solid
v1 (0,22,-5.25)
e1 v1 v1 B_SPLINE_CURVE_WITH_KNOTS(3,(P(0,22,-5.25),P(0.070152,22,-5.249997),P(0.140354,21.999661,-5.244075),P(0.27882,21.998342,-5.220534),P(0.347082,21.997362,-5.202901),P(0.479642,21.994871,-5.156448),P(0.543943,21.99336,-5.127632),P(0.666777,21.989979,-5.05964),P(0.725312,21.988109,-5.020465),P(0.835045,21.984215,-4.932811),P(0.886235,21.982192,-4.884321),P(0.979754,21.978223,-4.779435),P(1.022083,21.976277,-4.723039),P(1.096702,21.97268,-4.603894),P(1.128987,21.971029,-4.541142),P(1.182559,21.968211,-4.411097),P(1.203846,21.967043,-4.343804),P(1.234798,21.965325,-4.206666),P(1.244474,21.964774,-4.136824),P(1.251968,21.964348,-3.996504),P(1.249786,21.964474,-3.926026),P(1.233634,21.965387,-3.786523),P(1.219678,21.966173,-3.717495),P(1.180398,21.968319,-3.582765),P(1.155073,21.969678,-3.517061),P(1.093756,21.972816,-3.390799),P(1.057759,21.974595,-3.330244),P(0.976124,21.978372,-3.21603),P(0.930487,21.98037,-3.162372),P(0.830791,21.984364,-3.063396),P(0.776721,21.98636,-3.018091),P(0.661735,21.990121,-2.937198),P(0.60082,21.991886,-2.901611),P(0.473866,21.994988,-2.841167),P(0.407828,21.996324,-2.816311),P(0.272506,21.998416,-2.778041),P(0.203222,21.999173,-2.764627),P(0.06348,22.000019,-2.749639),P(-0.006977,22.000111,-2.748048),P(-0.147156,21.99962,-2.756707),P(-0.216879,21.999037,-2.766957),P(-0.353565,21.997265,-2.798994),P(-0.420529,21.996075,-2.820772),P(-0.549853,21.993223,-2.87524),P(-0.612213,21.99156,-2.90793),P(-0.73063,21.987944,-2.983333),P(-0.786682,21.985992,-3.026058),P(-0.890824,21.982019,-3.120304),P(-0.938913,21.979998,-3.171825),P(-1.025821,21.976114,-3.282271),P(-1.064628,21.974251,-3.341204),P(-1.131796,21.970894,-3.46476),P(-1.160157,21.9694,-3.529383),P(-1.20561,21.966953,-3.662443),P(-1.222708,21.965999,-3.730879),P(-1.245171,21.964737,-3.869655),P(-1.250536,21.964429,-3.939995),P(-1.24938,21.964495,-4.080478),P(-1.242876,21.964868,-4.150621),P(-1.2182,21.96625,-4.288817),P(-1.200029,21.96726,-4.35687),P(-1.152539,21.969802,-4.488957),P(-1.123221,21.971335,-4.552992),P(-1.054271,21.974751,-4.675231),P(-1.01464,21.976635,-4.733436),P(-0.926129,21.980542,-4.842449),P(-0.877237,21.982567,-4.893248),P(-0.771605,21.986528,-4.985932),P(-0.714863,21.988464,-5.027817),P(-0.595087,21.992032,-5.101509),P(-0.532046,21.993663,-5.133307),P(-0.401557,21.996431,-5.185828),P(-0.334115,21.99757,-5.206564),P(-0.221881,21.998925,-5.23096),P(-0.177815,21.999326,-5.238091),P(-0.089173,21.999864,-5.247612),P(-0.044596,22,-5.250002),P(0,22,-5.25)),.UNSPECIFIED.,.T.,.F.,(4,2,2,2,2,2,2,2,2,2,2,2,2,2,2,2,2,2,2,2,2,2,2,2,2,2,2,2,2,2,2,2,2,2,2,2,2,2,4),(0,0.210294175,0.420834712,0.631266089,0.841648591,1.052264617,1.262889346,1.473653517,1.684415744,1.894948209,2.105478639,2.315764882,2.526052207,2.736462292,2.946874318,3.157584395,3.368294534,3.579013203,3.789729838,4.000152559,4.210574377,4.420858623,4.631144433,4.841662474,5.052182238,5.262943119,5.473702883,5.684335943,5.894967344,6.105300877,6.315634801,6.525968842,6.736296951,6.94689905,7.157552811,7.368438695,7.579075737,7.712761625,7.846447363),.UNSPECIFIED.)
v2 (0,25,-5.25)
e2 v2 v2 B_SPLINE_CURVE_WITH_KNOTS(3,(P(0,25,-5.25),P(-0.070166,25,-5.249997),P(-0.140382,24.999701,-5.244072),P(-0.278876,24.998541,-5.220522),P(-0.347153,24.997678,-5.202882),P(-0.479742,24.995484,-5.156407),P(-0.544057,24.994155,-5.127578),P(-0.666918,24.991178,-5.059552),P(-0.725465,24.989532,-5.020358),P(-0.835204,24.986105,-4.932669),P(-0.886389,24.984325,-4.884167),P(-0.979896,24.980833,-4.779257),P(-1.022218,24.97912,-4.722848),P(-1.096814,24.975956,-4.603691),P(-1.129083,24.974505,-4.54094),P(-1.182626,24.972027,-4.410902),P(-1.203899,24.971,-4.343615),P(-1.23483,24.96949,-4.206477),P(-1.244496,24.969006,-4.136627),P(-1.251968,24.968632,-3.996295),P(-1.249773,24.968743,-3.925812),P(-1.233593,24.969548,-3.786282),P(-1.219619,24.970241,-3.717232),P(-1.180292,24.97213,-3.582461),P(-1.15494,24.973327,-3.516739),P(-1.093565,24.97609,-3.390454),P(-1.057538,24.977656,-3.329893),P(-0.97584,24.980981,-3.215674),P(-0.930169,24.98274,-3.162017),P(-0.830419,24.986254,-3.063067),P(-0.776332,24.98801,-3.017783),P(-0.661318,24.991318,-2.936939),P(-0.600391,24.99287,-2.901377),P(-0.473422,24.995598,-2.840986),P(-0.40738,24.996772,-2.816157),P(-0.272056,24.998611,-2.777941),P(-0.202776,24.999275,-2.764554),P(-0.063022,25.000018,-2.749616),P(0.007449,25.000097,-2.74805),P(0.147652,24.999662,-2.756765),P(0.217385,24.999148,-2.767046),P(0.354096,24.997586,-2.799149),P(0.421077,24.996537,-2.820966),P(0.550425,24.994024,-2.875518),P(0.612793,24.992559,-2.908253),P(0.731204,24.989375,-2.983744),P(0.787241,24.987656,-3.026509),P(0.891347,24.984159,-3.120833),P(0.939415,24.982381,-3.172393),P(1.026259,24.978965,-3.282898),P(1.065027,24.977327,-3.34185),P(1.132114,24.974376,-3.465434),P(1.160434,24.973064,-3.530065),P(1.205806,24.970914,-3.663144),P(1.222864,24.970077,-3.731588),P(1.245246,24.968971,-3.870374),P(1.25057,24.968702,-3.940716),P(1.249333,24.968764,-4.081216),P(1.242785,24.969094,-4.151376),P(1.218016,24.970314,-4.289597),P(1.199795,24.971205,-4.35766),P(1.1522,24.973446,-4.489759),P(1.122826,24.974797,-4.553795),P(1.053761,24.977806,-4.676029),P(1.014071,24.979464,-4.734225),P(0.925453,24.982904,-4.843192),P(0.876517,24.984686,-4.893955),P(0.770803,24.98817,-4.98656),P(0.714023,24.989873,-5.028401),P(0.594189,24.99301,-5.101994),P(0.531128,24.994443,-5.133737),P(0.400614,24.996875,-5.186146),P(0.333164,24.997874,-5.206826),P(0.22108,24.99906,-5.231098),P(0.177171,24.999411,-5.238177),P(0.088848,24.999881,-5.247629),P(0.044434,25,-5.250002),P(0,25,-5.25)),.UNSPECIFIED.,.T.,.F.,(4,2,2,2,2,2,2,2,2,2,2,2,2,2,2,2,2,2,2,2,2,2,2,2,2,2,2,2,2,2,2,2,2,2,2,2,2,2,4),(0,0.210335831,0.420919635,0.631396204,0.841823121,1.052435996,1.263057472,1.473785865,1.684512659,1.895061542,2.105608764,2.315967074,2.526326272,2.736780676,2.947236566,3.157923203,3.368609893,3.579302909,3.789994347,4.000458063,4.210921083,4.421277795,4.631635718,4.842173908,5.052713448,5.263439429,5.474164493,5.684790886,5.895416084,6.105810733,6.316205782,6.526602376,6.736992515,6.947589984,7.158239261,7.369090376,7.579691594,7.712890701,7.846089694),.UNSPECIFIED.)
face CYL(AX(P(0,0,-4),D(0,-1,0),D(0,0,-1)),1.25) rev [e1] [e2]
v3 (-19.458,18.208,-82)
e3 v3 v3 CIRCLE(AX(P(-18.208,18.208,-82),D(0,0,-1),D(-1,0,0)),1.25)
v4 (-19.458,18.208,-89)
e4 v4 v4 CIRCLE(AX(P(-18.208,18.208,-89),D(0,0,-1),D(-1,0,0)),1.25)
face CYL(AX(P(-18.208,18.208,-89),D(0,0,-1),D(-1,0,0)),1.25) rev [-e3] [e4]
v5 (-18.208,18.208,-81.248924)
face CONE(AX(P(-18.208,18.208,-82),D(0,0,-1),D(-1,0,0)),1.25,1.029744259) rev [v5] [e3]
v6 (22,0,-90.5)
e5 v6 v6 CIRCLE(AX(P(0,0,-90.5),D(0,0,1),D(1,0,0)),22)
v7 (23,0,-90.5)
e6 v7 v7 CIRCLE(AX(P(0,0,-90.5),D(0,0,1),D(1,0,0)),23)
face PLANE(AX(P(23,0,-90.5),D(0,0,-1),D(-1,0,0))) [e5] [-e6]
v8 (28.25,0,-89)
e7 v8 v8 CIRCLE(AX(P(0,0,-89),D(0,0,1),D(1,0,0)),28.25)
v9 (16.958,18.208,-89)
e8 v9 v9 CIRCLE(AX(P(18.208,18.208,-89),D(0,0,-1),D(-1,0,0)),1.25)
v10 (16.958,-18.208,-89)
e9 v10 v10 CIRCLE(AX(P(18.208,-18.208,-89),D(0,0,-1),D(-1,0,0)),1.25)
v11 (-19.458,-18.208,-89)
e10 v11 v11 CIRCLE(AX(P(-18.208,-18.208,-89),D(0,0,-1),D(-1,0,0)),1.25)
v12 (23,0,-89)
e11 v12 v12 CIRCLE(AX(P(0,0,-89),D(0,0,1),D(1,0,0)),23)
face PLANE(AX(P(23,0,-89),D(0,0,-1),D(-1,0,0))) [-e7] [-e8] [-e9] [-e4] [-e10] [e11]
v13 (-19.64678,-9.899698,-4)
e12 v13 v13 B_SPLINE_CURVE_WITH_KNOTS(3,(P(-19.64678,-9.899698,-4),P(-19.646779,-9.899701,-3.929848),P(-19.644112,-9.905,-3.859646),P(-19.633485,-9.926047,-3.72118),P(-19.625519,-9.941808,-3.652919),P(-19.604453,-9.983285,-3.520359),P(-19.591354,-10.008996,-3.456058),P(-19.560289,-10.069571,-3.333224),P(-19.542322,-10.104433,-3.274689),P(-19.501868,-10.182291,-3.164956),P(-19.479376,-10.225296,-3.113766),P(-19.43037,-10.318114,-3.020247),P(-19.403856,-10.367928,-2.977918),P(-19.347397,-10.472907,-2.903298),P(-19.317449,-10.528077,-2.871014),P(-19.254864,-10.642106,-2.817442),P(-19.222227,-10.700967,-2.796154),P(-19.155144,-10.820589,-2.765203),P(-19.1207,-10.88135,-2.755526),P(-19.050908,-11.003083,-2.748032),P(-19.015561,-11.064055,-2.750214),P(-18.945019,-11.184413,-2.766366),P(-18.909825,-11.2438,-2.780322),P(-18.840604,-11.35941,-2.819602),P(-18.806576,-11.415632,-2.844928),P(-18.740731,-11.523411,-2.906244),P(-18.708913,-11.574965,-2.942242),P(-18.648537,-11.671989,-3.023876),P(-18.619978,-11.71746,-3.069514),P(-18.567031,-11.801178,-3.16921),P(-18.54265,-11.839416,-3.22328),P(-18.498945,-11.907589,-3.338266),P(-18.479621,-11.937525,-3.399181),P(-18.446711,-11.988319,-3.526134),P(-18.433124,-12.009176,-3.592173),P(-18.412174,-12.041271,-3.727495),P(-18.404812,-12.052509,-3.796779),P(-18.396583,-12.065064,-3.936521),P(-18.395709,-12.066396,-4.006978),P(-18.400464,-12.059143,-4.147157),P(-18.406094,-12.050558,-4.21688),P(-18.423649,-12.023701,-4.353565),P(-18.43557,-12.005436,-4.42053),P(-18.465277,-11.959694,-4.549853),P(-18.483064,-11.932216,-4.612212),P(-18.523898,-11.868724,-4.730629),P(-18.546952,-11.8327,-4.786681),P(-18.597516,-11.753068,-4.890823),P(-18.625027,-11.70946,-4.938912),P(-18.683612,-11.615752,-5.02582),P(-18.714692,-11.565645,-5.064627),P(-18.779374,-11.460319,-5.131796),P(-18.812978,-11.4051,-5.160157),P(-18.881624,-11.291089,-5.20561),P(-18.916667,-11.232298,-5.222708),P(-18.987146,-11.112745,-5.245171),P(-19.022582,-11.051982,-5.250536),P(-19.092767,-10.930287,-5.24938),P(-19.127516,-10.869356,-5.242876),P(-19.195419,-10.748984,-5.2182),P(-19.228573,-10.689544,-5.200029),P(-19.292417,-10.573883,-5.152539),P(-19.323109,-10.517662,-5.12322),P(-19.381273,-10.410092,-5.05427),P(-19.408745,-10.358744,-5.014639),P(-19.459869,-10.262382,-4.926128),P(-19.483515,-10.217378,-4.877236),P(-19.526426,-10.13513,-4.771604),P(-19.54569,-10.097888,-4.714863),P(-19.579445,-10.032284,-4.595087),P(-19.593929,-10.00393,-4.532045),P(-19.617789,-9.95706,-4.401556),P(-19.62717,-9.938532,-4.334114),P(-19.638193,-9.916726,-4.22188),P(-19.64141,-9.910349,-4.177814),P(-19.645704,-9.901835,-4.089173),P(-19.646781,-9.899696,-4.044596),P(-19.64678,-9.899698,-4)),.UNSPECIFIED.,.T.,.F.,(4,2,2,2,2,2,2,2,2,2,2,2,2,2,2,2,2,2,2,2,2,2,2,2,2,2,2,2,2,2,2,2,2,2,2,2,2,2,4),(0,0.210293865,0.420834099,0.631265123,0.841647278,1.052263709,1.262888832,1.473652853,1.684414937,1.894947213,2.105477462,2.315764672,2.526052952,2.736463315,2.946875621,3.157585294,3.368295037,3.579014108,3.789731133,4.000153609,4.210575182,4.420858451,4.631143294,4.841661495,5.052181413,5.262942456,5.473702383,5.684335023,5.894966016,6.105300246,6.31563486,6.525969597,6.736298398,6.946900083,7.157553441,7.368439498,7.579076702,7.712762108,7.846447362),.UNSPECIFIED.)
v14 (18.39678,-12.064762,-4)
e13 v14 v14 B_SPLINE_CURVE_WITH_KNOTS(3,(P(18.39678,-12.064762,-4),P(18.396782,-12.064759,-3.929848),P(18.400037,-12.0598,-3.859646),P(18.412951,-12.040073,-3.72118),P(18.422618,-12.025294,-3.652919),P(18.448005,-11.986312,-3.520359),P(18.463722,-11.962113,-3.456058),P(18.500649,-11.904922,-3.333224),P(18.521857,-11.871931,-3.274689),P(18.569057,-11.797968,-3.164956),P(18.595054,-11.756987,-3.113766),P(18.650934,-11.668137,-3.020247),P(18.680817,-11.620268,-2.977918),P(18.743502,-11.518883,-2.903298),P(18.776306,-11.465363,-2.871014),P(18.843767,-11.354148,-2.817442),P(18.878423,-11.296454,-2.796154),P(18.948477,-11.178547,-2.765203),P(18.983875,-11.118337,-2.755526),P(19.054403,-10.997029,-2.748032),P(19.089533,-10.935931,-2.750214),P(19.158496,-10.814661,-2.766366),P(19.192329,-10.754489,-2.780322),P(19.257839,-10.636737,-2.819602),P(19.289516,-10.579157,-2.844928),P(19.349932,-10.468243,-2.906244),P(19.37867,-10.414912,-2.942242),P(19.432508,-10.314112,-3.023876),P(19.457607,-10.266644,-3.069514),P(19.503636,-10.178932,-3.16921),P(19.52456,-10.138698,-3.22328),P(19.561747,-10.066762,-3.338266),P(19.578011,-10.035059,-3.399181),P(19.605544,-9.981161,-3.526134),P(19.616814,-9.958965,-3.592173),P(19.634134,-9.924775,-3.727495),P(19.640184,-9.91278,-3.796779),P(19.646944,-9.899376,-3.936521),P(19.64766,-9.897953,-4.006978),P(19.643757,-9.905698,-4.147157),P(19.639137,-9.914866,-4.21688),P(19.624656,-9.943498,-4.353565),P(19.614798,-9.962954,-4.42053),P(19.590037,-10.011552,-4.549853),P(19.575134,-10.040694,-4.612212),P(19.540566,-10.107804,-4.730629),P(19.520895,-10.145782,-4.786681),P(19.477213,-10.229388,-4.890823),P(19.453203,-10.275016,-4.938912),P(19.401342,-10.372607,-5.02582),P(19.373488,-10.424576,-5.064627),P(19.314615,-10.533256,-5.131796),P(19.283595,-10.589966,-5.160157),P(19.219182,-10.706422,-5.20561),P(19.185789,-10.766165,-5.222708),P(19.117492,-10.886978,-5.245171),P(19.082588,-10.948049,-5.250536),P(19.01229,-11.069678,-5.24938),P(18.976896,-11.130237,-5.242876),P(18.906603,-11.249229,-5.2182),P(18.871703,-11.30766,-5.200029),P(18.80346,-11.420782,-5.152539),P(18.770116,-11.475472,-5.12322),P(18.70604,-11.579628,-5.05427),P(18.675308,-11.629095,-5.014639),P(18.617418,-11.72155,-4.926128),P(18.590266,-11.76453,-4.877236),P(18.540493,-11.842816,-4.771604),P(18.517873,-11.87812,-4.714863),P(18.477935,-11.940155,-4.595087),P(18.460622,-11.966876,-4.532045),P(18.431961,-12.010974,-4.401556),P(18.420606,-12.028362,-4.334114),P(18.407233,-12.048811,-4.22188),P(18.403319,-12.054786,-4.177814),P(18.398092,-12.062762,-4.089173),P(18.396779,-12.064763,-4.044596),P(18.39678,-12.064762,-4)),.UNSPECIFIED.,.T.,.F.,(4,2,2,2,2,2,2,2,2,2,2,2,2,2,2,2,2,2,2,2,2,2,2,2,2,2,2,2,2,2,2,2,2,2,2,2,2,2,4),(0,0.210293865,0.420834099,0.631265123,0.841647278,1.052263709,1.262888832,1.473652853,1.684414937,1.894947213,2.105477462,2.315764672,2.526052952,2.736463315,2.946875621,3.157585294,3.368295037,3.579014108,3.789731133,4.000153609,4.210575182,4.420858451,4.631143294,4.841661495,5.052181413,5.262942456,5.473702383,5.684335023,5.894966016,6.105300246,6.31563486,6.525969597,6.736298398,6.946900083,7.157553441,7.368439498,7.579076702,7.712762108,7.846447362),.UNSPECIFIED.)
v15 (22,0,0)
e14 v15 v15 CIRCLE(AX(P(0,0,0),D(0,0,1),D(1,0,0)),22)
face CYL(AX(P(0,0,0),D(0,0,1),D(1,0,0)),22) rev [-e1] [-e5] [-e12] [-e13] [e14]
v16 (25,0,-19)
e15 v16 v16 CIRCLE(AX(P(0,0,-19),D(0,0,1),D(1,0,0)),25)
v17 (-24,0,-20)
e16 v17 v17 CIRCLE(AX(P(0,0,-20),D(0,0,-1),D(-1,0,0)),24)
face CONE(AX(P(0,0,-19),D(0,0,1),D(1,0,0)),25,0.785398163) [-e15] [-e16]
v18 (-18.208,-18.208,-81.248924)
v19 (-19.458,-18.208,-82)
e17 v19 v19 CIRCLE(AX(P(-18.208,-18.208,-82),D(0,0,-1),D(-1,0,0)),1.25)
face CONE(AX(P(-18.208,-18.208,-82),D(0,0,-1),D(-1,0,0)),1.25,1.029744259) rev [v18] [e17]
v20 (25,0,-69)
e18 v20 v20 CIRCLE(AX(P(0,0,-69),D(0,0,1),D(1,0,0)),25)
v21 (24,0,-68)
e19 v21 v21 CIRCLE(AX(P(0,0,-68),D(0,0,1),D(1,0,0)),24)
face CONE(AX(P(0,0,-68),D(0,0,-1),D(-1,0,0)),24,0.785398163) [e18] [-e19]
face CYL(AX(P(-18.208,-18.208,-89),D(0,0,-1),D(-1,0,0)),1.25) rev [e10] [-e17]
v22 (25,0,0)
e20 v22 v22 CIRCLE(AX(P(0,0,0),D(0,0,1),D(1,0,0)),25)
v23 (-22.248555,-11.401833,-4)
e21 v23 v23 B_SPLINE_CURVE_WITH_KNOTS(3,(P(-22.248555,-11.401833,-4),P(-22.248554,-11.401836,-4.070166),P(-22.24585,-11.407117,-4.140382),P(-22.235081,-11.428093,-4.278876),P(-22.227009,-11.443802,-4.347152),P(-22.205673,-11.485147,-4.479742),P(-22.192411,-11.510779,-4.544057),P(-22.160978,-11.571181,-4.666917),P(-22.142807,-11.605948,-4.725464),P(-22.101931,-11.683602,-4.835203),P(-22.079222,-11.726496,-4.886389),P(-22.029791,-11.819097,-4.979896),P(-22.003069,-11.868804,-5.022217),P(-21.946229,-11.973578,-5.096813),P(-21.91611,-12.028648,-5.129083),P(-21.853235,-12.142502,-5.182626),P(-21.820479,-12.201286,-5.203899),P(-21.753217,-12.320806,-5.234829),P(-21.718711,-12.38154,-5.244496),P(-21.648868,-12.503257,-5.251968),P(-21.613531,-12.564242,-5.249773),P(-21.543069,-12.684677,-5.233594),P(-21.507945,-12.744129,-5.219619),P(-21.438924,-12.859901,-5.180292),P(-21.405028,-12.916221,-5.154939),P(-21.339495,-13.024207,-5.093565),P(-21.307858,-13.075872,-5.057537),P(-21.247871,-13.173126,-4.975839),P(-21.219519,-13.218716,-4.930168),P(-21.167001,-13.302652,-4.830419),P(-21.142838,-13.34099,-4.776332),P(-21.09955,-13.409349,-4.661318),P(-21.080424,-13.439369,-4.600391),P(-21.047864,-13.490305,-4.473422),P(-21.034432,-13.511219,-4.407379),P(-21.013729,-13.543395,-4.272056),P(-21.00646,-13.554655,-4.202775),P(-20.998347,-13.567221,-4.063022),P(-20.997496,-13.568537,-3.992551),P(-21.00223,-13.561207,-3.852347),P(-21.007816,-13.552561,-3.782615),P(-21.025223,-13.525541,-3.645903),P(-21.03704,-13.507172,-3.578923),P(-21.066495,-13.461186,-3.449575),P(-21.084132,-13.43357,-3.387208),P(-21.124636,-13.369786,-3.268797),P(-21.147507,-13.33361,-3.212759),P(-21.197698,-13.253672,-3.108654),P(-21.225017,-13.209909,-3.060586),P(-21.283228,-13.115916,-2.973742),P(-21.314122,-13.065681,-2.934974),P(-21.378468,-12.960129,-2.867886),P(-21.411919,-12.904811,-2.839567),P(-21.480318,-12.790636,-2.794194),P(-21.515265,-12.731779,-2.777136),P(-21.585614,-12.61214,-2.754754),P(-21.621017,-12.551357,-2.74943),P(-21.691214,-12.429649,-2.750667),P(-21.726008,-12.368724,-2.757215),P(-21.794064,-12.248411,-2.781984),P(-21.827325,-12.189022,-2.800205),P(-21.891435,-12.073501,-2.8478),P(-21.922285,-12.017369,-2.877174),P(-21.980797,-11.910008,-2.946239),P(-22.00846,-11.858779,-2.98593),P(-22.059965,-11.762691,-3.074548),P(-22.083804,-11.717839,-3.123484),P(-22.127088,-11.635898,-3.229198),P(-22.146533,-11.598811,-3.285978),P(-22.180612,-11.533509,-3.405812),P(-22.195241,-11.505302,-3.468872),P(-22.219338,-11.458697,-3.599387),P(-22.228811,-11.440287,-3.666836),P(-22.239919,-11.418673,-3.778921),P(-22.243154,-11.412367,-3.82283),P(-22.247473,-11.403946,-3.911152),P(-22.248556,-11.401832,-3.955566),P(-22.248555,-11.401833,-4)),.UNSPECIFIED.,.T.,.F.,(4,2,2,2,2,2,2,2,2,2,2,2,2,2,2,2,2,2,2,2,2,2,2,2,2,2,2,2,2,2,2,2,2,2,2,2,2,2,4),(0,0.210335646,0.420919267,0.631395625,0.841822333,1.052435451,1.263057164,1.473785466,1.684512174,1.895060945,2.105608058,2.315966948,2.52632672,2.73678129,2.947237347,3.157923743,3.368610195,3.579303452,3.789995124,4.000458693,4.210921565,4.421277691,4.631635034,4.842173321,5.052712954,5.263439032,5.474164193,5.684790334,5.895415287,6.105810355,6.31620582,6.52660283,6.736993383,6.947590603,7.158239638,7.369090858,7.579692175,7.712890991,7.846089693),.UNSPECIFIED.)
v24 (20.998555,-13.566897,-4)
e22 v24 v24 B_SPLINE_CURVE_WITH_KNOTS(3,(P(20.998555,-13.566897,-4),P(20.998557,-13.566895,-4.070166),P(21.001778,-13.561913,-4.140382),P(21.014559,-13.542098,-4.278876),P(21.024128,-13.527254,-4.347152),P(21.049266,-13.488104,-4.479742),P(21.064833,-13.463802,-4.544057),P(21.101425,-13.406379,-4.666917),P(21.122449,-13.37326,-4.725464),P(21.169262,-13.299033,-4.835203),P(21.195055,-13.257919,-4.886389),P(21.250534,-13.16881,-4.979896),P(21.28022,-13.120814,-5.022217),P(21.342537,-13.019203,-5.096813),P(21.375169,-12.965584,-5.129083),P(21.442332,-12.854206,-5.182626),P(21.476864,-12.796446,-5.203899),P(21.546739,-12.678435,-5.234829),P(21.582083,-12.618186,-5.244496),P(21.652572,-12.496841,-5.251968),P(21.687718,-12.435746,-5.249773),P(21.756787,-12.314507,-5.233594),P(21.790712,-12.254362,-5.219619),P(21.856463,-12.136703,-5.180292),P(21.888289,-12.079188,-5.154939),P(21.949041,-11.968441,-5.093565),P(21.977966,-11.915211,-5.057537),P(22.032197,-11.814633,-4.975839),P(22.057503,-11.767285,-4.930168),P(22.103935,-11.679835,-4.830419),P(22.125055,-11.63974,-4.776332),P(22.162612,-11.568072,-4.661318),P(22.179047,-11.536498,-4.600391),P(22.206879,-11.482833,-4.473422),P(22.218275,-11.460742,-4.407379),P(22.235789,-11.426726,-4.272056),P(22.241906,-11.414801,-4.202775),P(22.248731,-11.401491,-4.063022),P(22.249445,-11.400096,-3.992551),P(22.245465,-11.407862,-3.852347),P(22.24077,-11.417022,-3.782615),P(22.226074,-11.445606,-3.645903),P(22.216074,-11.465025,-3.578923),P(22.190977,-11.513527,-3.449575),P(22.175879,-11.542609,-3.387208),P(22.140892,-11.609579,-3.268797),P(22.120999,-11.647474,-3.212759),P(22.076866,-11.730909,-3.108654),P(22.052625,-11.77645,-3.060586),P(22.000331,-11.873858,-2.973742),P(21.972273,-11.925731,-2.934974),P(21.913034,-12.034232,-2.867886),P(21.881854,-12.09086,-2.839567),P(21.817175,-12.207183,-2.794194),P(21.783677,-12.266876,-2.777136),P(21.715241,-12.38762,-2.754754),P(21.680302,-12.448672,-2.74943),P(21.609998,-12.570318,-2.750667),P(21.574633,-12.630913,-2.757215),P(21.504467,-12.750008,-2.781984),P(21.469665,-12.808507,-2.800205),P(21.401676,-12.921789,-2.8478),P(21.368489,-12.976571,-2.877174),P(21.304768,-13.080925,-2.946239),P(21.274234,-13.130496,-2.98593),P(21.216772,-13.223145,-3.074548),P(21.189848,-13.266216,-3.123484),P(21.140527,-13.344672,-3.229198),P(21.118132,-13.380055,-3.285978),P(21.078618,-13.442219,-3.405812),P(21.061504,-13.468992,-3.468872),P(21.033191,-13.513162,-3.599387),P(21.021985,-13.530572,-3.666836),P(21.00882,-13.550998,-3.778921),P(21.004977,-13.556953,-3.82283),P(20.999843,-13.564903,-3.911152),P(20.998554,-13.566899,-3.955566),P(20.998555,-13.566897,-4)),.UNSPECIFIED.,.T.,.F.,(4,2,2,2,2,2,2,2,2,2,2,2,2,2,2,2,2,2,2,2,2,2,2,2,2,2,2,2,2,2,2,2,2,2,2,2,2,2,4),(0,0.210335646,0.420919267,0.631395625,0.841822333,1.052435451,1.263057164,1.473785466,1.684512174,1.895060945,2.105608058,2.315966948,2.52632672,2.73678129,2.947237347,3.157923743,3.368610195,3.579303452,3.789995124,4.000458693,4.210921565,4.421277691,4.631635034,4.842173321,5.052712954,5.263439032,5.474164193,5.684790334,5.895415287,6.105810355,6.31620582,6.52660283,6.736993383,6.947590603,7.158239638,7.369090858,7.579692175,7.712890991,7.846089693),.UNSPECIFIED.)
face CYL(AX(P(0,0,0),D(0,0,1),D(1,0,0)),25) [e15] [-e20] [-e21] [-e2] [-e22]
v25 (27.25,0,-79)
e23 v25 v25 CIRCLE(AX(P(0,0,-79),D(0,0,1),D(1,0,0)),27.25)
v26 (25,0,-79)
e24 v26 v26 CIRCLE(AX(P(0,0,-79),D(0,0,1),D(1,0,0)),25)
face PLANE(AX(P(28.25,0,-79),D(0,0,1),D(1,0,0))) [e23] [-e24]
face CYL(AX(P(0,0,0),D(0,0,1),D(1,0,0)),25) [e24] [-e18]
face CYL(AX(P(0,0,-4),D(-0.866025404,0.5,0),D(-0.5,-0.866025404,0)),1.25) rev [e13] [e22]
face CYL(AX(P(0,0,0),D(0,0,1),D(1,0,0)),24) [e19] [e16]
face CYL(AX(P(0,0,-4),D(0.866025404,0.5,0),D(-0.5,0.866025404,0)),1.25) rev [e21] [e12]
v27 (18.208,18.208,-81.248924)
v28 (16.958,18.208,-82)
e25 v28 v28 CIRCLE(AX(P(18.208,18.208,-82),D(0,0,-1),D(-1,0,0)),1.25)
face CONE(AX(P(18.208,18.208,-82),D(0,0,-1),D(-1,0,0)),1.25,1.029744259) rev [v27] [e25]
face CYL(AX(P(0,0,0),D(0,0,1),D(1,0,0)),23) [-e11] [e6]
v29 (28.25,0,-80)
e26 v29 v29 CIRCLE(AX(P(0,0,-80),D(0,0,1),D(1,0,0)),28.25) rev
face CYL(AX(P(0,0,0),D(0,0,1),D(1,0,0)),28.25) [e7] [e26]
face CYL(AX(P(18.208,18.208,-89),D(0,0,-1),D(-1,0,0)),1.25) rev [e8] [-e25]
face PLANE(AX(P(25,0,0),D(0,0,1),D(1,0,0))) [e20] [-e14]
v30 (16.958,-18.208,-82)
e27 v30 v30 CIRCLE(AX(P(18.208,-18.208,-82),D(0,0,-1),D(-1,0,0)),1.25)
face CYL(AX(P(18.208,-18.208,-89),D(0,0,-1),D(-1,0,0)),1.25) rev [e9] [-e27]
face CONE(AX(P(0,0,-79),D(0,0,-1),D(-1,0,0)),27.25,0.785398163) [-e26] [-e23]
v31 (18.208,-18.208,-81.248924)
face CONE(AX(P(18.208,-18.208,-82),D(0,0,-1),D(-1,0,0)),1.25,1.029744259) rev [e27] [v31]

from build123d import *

# Parameters (mm, degrees)
HOLE_WIZARD_M3_1_D       = 2.5
HOLE_WIZARD_M3_1_DEPTH   = 7
HOLE_WIZARD_M3_1_TIP     = 0.751075774
CHAMFER_2_SIZE           = 1
SKETCH_20_W              = 1.25
SKETCH_20_H              = 28.25
PATTERN_CIRCULAR_1_COUNT = 3


with BuildPart() as part:
    # 草图1 → 旋转1 (revolve)
    with BuildSketch(Plane(origin=(0, 0, 0), x_dir=(1, 0, 0), z_dir=(0, 1, 0))):
        Polygon((25, 0), (25, 19), (24, 19), (24, 69), (25, 69), (25, 79), (28.25, 79), (28.25, 89), (23, 89), (23, 90.5), (22, 90.5), (22, 0), align=None)
    revolve(axis=Axis((0, 0, 0), (0, 0, -1)))

    # M3 螺纹孔1
    with Locations(Plane(origin=(0, 0, -89), x_dir=(-1, 0, 0), z_dir=(0, 0, -1))):
        with Locations((-18.207999616, 18.207999616), (18.207999616, 18.207999616), (18.207999616, -18.207999616), (-18.207999616, -18.207999616)):
            Hole(HOLE_WIZARD_M3_1_D / 2, depth=HOLE_WIZARD_M3_1_DEPTH)
            with Locations((0, 0, -(HOLE_WIZARD_M3_1_DEPTH + HOLE_WIZARD_M3_1_TIP / 2))):  # 118° drill point
                Cone(0, HOLE_WIZARD_M3_1_D / 2, HOLE_WIZARD_M3_1_TIP, mode=Mode.SUBTRACT)

    # 倒角2
    chamfer_2_edges = [part.edges().sort_by_distance(p)[0] for p in [
        (-28.25, 0, -79),
        (-24, 0, -69),
        (-24, 0, -19),
    ]]
    chamfer(chamfer_2_edges, length=CHAMFER_2_SIZE - 0.0001)  # a hair under: the kernel refuses the full size

    # 草图20 → M3 螺纹孔2 (revolve, cut)
    with BuildSketch(Plane(origin=(0, 0, -4), x_dir=(0, 0, -1), z_dir=(1, 0, 0))):
        with Locations((0.625, 14.125)):
            Rectangle(SKETCH_20_W, SKETCH_20_H)
    hole_wizard_m3_2 = revolve(axis=Axis((0, -6.35, -4), (0, 1, 0)), mode=Mode.SUBTRACT)

    # 阵列(圆周)1: M3 螺纹孔2 ×3 about axis
    pattern_circular_1_axis = Axis((0, 0, 0), (0, 0, 1))
    for i in range(1, PATTERN_CIRCULAR_1_COUNT):
        add(hole_wizard_m3_2.rotate(pattern_circular_1_axis, i * 360 / PATTERN_CIRCULAR_1_COUNT), mode=Mode.SUBTRACT)


solid = part.part
